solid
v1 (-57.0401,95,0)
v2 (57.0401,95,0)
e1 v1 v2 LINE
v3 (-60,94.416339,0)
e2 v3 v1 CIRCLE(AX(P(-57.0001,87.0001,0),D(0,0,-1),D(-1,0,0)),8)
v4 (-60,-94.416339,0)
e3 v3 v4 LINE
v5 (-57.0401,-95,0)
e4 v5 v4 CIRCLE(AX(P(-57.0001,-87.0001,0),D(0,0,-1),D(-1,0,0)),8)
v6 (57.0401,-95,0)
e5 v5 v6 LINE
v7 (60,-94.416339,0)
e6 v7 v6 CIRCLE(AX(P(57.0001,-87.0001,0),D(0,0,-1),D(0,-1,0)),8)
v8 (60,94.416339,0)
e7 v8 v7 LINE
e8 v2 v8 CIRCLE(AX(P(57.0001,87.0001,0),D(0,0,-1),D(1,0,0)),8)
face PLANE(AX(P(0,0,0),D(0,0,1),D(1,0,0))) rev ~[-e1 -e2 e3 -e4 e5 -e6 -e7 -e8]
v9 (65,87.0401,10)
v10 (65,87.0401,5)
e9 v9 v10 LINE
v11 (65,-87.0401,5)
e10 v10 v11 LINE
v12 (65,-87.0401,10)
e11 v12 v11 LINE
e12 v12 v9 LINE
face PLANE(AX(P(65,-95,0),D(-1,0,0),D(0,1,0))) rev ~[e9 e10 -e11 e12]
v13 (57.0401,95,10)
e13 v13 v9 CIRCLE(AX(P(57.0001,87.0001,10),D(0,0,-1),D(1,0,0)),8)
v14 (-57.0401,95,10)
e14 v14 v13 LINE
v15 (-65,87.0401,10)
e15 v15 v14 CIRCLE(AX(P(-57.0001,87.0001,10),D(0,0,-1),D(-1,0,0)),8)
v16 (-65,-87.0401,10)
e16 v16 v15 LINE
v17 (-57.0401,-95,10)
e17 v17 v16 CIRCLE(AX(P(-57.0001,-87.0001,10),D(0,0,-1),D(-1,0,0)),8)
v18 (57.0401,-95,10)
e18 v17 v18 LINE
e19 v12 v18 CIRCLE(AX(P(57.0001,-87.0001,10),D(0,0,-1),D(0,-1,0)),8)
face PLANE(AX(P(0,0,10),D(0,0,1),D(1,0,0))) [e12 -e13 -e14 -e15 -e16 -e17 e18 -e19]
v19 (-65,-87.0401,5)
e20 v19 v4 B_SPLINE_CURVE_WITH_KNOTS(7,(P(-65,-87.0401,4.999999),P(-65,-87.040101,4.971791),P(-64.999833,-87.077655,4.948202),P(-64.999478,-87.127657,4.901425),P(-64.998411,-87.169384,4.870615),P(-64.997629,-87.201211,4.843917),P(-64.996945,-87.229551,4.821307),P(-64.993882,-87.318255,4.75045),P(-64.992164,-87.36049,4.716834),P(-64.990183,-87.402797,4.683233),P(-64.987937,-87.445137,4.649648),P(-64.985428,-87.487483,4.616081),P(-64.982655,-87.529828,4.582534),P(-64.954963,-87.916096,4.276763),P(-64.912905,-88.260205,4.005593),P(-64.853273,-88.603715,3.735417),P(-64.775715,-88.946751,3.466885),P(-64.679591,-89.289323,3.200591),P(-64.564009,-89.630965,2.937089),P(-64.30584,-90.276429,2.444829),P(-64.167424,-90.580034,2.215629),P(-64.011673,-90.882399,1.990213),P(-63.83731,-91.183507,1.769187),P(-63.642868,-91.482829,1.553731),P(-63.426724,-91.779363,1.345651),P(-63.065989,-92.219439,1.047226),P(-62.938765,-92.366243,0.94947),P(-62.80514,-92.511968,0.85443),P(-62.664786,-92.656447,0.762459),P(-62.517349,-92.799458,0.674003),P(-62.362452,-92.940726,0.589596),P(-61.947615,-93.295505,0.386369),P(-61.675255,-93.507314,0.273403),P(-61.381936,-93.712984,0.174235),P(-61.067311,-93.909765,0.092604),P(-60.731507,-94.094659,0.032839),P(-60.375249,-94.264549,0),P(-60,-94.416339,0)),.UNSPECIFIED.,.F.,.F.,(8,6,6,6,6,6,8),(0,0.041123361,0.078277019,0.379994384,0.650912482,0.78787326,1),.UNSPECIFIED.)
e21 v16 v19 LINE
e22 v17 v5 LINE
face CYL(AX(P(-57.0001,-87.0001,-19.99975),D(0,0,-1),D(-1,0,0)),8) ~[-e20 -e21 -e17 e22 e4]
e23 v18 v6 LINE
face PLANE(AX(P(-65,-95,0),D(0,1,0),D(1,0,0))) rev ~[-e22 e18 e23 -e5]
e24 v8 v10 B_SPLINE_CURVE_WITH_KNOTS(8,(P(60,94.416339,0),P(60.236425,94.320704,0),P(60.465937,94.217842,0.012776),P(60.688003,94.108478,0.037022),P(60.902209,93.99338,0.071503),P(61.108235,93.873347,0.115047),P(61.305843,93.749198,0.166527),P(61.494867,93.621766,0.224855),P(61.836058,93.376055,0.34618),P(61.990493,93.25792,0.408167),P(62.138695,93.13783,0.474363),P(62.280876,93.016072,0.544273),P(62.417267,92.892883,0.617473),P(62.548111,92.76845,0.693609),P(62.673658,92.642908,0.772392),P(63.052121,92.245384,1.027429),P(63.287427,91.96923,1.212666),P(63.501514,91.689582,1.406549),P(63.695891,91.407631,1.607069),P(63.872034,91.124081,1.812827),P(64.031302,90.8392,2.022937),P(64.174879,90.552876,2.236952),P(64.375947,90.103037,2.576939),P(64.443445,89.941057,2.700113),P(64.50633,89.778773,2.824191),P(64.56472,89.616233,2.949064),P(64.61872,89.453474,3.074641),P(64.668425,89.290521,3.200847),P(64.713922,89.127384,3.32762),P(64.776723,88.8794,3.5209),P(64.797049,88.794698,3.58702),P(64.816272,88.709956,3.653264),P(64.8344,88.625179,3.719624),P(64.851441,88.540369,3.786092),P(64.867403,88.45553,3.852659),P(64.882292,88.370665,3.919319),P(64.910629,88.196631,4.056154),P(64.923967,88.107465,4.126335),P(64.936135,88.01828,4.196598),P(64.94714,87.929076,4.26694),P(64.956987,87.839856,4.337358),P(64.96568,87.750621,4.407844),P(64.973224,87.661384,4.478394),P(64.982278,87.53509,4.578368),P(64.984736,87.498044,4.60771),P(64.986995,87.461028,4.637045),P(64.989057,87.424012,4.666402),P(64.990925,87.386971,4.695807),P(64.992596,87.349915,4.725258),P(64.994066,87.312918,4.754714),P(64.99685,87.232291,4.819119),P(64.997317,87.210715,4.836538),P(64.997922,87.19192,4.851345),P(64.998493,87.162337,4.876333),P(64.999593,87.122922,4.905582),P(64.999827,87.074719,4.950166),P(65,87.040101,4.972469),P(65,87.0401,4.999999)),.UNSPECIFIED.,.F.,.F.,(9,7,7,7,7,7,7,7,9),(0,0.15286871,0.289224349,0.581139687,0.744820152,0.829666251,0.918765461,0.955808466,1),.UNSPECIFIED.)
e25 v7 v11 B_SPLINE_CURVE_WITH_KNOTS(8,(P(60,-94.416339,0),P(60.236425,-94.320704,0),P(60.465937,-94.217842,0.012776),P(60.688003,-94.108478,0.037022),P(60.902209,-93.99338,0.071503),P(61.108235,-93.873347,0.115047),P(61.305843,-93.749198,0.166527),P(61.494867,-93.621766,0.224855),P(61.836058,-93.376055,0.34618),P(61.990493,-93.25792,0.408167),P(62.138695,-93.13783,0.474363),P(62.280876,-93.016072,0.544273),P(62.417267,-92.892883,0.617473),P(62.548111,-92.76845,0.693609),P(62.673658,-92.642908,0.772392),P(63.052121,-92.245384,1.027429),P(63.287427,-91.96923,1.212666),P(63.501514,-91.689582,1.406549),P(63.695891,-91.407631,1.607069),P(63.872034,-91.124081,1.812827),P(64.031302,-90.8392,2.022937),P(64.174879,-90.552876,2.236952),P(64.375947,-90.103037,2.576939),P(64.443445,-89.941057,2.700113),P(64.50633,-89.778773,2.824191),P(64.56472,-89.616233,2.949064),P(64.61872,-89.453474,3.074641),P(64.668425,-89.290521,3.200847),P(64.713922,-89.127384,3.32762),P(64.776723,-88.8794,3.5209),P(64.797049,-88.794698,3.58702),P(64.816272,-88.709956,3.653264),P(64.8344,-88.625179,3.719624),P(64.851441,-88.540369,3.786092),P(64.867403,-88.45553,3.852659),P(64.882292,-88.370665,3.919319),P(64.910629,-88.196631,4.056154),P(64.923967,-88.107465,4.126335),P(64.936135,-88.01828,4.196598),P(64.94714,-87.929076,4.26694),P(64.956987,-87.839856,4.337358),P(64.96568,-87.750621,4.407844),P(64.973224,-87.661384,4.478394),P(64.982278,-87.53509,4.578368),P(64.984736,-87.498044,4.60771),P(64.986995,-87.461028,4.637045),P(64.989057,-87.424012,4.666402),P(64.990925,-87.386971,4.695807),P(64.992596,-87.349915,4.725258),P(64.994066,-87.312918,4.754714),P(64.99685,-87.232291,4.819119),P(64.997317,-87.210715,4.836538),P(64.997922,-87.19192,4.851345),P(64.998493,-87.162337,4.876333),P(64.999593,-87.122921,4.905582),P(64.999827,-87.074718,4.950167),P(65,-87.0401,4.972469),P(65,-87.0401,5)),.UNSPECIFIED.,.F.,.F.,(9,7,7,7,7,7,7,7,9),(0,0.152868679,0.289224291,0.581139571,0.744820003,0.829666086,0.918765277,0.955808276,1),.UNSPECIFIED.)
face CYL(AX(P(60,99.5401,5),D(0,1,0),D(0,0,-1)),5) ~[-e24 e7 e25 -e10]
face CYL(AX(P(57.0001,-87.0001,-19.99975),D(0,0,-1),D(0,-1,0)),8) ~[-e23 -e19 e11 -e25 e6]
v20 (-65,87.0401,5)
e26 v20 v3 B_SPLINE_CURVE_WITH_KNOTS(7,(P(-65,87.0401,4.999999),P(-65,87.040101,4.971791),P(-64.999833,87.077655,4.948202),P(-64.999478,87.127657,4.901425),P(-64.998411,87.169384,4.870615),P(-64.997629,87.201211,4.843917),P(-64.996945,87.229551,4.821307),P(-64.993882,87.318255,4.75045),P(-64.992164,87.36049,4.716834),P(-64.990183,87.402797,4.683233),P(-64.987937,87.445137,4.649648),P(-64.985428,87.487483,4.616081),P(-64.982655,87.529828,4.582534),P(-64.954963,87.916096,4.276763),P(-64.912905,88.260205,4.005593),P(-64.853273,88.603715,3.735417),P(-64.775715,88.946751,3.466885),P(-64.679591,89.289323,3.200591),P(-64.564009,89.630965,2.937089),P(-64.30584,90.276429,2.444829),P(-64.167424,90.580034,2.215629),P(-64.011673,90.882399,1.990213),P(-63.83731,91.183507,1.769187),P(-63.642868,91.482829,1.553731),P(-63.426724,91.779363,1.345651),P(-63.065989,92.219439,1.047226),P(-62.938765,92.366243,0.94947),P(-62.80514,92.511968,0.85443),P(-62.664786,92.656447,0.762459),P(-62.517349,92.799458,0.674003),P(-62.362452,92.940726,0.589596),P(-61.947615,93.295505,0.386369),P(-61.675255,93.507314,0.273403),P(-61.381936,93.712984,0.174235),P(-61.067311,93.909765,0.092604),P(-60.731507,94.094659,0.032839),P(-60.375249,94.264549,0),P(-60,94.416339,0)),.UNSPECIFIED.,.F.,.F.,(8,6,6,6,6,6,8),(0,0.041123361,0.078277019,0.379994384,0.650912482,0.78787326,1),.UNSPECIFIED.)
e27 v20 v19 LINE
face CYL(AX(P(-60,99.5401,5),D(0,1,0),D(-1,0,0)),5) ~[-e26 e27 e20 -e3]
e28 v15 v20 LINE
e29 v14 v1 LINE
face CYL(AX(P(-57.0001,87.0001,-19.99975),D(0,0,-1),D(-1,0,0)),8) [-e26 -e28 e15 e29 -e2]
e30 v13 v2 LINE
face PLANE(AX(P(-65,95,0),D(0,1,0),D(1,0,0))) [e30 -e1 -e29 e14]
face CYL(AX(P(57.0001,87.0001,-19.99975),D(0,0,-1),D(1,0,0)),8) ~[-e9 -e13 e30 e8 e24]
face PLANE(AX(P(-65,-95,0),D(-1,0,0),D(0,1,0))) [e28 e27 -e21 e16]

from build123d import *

# Parameters (mm, degrees)
F0_W        = 130
F0_H        = 190
F1_DEPTH    = 10
F2_T1_DEPTH = 49.9995000031
F3_T1_DEPTH = 199.0801997502


# Not quite as in the source:
# - a fillet or chamfer that OpenCascade refuses, or shapes differently, is made with other operations: its cross-section is extruded or revolved along the edge and cut away or added


with BuildPart() as f1:
    # F0 (on Top) → F1 (new body)
    with BuildSketch(Plane.XY):
        Rectangle(F0_W, F0_H)
    extrude(amount=F1_DEPTH)

    # F2: fillet of radius 8 on 4 edges, made by hand

    # F2_s2 → F2_t1 (cut)
    with BuildSketch(Plane.XY.offset(-19.9997500016)):
        with BuildLine():
            ThreePointArc((-65.0001, 87.0001), (-62.6569542495, 92.6569542495), (-57.0001, 95.0001))
            Line((-57.0001, 95.0001), (-57.0001, 95.1601))
            ThreePointArc((-57.0001, 95.1601), (-61.00005, 95.16), (-65, 95.16))
            Line((-65, 95.16), (-65.16, 95))
            ThreePointArc((-65.16, 95), (-65.16, 91.00005), (-65.1601, 87.0001))
            Line((-65.1601, 87.0001), (-65.0001, 87.0001))
        make_face()
        with BuildLine():
            ThreePointArc((65.0001, 87.0001), (62.6569542495, 92.6569542495), (57.0001, 95.0001))
            Line((57.0001, 95.0001), (57.0001, 95.1601))
            ThreePointArc((57.0001, 95.1601), (61.00005, 95.16), (65, 95.16))
            Line((65, 95.16), (65.16, 95))
            ThreePointArc((65.16, 95), (65.16, 91.00005), (65.1601, 87.0001))
            Line((65.1601, 87.0001), (65.0001, 87.0001))
        make_face()
        with BuildLine():
            ThreePointArc((57.0001, -95.0001), (62.6569542495, -92.6569542495), (65.0001, -87.0001))
            Line((65.0001, -87.0001), (65.1601, -87.0001))
            ThreePointArc((65.1601, -87.0001), (65.16, -91.00005), (65.16, -95))
            Line((65.16, -95), (65, -95.16))
            ThreePointArc((65, -95.16), (61.00005, -95.16), (57.0001, -95.1601))
            Line((57.0001, -95.1601), (57.0001, -95.0001))
        make_face()
        with BuildLine():
            ThreePointArc((-65.0001, -87.0001), (-62.6569542495, -92.6569542495), (-57.0001, -95.0001))
            Line((-57.0001, -95.0001), (-57.0001, -95.1601))
            ThreePointArc((-57.0001, -95.1601), (-61.00005, -95.16), (-65, -95.16))
            Line((-65, -95.16), (-65.16, -95))
            ThreePointArc((-65.16, -95), (-65.16, -91.00005), (-65.1601, -87.0001))
            Line((-65.1601, -87.0001), (-65.0001, -87.0001))
        make_face()
    extrude(amount=F2_T1_DEPTH, mode=Mode.SUBTRACT)

    # F3: fillet of radius 5 on 2 edges, made by hand

    # F3_s2 → F3_t1 (cut)
    with BuildSketch(Plane.XZ.offset(-99.5400998751)):
        with BuildLine():
            ThreePointArc((60, 0), (63.5355339059, 1.4644660941), (65, 5))
            Line((65, 5), (65, 0))
            Line((65, 0), (60, 0))
        make_face()
        with BuildLine():
            ThreePointArc((-65, 5), (-63.5355339059, 1.4644660941), (-60, 0))
            Line((-60, 0), (-65, 0))
            Line((-65, 0), (-65, 5))
        make_face()
    extrude(amount=F3_T1_DEPTH, mode=Mode.SUBTRACT)


solid = f1.part
